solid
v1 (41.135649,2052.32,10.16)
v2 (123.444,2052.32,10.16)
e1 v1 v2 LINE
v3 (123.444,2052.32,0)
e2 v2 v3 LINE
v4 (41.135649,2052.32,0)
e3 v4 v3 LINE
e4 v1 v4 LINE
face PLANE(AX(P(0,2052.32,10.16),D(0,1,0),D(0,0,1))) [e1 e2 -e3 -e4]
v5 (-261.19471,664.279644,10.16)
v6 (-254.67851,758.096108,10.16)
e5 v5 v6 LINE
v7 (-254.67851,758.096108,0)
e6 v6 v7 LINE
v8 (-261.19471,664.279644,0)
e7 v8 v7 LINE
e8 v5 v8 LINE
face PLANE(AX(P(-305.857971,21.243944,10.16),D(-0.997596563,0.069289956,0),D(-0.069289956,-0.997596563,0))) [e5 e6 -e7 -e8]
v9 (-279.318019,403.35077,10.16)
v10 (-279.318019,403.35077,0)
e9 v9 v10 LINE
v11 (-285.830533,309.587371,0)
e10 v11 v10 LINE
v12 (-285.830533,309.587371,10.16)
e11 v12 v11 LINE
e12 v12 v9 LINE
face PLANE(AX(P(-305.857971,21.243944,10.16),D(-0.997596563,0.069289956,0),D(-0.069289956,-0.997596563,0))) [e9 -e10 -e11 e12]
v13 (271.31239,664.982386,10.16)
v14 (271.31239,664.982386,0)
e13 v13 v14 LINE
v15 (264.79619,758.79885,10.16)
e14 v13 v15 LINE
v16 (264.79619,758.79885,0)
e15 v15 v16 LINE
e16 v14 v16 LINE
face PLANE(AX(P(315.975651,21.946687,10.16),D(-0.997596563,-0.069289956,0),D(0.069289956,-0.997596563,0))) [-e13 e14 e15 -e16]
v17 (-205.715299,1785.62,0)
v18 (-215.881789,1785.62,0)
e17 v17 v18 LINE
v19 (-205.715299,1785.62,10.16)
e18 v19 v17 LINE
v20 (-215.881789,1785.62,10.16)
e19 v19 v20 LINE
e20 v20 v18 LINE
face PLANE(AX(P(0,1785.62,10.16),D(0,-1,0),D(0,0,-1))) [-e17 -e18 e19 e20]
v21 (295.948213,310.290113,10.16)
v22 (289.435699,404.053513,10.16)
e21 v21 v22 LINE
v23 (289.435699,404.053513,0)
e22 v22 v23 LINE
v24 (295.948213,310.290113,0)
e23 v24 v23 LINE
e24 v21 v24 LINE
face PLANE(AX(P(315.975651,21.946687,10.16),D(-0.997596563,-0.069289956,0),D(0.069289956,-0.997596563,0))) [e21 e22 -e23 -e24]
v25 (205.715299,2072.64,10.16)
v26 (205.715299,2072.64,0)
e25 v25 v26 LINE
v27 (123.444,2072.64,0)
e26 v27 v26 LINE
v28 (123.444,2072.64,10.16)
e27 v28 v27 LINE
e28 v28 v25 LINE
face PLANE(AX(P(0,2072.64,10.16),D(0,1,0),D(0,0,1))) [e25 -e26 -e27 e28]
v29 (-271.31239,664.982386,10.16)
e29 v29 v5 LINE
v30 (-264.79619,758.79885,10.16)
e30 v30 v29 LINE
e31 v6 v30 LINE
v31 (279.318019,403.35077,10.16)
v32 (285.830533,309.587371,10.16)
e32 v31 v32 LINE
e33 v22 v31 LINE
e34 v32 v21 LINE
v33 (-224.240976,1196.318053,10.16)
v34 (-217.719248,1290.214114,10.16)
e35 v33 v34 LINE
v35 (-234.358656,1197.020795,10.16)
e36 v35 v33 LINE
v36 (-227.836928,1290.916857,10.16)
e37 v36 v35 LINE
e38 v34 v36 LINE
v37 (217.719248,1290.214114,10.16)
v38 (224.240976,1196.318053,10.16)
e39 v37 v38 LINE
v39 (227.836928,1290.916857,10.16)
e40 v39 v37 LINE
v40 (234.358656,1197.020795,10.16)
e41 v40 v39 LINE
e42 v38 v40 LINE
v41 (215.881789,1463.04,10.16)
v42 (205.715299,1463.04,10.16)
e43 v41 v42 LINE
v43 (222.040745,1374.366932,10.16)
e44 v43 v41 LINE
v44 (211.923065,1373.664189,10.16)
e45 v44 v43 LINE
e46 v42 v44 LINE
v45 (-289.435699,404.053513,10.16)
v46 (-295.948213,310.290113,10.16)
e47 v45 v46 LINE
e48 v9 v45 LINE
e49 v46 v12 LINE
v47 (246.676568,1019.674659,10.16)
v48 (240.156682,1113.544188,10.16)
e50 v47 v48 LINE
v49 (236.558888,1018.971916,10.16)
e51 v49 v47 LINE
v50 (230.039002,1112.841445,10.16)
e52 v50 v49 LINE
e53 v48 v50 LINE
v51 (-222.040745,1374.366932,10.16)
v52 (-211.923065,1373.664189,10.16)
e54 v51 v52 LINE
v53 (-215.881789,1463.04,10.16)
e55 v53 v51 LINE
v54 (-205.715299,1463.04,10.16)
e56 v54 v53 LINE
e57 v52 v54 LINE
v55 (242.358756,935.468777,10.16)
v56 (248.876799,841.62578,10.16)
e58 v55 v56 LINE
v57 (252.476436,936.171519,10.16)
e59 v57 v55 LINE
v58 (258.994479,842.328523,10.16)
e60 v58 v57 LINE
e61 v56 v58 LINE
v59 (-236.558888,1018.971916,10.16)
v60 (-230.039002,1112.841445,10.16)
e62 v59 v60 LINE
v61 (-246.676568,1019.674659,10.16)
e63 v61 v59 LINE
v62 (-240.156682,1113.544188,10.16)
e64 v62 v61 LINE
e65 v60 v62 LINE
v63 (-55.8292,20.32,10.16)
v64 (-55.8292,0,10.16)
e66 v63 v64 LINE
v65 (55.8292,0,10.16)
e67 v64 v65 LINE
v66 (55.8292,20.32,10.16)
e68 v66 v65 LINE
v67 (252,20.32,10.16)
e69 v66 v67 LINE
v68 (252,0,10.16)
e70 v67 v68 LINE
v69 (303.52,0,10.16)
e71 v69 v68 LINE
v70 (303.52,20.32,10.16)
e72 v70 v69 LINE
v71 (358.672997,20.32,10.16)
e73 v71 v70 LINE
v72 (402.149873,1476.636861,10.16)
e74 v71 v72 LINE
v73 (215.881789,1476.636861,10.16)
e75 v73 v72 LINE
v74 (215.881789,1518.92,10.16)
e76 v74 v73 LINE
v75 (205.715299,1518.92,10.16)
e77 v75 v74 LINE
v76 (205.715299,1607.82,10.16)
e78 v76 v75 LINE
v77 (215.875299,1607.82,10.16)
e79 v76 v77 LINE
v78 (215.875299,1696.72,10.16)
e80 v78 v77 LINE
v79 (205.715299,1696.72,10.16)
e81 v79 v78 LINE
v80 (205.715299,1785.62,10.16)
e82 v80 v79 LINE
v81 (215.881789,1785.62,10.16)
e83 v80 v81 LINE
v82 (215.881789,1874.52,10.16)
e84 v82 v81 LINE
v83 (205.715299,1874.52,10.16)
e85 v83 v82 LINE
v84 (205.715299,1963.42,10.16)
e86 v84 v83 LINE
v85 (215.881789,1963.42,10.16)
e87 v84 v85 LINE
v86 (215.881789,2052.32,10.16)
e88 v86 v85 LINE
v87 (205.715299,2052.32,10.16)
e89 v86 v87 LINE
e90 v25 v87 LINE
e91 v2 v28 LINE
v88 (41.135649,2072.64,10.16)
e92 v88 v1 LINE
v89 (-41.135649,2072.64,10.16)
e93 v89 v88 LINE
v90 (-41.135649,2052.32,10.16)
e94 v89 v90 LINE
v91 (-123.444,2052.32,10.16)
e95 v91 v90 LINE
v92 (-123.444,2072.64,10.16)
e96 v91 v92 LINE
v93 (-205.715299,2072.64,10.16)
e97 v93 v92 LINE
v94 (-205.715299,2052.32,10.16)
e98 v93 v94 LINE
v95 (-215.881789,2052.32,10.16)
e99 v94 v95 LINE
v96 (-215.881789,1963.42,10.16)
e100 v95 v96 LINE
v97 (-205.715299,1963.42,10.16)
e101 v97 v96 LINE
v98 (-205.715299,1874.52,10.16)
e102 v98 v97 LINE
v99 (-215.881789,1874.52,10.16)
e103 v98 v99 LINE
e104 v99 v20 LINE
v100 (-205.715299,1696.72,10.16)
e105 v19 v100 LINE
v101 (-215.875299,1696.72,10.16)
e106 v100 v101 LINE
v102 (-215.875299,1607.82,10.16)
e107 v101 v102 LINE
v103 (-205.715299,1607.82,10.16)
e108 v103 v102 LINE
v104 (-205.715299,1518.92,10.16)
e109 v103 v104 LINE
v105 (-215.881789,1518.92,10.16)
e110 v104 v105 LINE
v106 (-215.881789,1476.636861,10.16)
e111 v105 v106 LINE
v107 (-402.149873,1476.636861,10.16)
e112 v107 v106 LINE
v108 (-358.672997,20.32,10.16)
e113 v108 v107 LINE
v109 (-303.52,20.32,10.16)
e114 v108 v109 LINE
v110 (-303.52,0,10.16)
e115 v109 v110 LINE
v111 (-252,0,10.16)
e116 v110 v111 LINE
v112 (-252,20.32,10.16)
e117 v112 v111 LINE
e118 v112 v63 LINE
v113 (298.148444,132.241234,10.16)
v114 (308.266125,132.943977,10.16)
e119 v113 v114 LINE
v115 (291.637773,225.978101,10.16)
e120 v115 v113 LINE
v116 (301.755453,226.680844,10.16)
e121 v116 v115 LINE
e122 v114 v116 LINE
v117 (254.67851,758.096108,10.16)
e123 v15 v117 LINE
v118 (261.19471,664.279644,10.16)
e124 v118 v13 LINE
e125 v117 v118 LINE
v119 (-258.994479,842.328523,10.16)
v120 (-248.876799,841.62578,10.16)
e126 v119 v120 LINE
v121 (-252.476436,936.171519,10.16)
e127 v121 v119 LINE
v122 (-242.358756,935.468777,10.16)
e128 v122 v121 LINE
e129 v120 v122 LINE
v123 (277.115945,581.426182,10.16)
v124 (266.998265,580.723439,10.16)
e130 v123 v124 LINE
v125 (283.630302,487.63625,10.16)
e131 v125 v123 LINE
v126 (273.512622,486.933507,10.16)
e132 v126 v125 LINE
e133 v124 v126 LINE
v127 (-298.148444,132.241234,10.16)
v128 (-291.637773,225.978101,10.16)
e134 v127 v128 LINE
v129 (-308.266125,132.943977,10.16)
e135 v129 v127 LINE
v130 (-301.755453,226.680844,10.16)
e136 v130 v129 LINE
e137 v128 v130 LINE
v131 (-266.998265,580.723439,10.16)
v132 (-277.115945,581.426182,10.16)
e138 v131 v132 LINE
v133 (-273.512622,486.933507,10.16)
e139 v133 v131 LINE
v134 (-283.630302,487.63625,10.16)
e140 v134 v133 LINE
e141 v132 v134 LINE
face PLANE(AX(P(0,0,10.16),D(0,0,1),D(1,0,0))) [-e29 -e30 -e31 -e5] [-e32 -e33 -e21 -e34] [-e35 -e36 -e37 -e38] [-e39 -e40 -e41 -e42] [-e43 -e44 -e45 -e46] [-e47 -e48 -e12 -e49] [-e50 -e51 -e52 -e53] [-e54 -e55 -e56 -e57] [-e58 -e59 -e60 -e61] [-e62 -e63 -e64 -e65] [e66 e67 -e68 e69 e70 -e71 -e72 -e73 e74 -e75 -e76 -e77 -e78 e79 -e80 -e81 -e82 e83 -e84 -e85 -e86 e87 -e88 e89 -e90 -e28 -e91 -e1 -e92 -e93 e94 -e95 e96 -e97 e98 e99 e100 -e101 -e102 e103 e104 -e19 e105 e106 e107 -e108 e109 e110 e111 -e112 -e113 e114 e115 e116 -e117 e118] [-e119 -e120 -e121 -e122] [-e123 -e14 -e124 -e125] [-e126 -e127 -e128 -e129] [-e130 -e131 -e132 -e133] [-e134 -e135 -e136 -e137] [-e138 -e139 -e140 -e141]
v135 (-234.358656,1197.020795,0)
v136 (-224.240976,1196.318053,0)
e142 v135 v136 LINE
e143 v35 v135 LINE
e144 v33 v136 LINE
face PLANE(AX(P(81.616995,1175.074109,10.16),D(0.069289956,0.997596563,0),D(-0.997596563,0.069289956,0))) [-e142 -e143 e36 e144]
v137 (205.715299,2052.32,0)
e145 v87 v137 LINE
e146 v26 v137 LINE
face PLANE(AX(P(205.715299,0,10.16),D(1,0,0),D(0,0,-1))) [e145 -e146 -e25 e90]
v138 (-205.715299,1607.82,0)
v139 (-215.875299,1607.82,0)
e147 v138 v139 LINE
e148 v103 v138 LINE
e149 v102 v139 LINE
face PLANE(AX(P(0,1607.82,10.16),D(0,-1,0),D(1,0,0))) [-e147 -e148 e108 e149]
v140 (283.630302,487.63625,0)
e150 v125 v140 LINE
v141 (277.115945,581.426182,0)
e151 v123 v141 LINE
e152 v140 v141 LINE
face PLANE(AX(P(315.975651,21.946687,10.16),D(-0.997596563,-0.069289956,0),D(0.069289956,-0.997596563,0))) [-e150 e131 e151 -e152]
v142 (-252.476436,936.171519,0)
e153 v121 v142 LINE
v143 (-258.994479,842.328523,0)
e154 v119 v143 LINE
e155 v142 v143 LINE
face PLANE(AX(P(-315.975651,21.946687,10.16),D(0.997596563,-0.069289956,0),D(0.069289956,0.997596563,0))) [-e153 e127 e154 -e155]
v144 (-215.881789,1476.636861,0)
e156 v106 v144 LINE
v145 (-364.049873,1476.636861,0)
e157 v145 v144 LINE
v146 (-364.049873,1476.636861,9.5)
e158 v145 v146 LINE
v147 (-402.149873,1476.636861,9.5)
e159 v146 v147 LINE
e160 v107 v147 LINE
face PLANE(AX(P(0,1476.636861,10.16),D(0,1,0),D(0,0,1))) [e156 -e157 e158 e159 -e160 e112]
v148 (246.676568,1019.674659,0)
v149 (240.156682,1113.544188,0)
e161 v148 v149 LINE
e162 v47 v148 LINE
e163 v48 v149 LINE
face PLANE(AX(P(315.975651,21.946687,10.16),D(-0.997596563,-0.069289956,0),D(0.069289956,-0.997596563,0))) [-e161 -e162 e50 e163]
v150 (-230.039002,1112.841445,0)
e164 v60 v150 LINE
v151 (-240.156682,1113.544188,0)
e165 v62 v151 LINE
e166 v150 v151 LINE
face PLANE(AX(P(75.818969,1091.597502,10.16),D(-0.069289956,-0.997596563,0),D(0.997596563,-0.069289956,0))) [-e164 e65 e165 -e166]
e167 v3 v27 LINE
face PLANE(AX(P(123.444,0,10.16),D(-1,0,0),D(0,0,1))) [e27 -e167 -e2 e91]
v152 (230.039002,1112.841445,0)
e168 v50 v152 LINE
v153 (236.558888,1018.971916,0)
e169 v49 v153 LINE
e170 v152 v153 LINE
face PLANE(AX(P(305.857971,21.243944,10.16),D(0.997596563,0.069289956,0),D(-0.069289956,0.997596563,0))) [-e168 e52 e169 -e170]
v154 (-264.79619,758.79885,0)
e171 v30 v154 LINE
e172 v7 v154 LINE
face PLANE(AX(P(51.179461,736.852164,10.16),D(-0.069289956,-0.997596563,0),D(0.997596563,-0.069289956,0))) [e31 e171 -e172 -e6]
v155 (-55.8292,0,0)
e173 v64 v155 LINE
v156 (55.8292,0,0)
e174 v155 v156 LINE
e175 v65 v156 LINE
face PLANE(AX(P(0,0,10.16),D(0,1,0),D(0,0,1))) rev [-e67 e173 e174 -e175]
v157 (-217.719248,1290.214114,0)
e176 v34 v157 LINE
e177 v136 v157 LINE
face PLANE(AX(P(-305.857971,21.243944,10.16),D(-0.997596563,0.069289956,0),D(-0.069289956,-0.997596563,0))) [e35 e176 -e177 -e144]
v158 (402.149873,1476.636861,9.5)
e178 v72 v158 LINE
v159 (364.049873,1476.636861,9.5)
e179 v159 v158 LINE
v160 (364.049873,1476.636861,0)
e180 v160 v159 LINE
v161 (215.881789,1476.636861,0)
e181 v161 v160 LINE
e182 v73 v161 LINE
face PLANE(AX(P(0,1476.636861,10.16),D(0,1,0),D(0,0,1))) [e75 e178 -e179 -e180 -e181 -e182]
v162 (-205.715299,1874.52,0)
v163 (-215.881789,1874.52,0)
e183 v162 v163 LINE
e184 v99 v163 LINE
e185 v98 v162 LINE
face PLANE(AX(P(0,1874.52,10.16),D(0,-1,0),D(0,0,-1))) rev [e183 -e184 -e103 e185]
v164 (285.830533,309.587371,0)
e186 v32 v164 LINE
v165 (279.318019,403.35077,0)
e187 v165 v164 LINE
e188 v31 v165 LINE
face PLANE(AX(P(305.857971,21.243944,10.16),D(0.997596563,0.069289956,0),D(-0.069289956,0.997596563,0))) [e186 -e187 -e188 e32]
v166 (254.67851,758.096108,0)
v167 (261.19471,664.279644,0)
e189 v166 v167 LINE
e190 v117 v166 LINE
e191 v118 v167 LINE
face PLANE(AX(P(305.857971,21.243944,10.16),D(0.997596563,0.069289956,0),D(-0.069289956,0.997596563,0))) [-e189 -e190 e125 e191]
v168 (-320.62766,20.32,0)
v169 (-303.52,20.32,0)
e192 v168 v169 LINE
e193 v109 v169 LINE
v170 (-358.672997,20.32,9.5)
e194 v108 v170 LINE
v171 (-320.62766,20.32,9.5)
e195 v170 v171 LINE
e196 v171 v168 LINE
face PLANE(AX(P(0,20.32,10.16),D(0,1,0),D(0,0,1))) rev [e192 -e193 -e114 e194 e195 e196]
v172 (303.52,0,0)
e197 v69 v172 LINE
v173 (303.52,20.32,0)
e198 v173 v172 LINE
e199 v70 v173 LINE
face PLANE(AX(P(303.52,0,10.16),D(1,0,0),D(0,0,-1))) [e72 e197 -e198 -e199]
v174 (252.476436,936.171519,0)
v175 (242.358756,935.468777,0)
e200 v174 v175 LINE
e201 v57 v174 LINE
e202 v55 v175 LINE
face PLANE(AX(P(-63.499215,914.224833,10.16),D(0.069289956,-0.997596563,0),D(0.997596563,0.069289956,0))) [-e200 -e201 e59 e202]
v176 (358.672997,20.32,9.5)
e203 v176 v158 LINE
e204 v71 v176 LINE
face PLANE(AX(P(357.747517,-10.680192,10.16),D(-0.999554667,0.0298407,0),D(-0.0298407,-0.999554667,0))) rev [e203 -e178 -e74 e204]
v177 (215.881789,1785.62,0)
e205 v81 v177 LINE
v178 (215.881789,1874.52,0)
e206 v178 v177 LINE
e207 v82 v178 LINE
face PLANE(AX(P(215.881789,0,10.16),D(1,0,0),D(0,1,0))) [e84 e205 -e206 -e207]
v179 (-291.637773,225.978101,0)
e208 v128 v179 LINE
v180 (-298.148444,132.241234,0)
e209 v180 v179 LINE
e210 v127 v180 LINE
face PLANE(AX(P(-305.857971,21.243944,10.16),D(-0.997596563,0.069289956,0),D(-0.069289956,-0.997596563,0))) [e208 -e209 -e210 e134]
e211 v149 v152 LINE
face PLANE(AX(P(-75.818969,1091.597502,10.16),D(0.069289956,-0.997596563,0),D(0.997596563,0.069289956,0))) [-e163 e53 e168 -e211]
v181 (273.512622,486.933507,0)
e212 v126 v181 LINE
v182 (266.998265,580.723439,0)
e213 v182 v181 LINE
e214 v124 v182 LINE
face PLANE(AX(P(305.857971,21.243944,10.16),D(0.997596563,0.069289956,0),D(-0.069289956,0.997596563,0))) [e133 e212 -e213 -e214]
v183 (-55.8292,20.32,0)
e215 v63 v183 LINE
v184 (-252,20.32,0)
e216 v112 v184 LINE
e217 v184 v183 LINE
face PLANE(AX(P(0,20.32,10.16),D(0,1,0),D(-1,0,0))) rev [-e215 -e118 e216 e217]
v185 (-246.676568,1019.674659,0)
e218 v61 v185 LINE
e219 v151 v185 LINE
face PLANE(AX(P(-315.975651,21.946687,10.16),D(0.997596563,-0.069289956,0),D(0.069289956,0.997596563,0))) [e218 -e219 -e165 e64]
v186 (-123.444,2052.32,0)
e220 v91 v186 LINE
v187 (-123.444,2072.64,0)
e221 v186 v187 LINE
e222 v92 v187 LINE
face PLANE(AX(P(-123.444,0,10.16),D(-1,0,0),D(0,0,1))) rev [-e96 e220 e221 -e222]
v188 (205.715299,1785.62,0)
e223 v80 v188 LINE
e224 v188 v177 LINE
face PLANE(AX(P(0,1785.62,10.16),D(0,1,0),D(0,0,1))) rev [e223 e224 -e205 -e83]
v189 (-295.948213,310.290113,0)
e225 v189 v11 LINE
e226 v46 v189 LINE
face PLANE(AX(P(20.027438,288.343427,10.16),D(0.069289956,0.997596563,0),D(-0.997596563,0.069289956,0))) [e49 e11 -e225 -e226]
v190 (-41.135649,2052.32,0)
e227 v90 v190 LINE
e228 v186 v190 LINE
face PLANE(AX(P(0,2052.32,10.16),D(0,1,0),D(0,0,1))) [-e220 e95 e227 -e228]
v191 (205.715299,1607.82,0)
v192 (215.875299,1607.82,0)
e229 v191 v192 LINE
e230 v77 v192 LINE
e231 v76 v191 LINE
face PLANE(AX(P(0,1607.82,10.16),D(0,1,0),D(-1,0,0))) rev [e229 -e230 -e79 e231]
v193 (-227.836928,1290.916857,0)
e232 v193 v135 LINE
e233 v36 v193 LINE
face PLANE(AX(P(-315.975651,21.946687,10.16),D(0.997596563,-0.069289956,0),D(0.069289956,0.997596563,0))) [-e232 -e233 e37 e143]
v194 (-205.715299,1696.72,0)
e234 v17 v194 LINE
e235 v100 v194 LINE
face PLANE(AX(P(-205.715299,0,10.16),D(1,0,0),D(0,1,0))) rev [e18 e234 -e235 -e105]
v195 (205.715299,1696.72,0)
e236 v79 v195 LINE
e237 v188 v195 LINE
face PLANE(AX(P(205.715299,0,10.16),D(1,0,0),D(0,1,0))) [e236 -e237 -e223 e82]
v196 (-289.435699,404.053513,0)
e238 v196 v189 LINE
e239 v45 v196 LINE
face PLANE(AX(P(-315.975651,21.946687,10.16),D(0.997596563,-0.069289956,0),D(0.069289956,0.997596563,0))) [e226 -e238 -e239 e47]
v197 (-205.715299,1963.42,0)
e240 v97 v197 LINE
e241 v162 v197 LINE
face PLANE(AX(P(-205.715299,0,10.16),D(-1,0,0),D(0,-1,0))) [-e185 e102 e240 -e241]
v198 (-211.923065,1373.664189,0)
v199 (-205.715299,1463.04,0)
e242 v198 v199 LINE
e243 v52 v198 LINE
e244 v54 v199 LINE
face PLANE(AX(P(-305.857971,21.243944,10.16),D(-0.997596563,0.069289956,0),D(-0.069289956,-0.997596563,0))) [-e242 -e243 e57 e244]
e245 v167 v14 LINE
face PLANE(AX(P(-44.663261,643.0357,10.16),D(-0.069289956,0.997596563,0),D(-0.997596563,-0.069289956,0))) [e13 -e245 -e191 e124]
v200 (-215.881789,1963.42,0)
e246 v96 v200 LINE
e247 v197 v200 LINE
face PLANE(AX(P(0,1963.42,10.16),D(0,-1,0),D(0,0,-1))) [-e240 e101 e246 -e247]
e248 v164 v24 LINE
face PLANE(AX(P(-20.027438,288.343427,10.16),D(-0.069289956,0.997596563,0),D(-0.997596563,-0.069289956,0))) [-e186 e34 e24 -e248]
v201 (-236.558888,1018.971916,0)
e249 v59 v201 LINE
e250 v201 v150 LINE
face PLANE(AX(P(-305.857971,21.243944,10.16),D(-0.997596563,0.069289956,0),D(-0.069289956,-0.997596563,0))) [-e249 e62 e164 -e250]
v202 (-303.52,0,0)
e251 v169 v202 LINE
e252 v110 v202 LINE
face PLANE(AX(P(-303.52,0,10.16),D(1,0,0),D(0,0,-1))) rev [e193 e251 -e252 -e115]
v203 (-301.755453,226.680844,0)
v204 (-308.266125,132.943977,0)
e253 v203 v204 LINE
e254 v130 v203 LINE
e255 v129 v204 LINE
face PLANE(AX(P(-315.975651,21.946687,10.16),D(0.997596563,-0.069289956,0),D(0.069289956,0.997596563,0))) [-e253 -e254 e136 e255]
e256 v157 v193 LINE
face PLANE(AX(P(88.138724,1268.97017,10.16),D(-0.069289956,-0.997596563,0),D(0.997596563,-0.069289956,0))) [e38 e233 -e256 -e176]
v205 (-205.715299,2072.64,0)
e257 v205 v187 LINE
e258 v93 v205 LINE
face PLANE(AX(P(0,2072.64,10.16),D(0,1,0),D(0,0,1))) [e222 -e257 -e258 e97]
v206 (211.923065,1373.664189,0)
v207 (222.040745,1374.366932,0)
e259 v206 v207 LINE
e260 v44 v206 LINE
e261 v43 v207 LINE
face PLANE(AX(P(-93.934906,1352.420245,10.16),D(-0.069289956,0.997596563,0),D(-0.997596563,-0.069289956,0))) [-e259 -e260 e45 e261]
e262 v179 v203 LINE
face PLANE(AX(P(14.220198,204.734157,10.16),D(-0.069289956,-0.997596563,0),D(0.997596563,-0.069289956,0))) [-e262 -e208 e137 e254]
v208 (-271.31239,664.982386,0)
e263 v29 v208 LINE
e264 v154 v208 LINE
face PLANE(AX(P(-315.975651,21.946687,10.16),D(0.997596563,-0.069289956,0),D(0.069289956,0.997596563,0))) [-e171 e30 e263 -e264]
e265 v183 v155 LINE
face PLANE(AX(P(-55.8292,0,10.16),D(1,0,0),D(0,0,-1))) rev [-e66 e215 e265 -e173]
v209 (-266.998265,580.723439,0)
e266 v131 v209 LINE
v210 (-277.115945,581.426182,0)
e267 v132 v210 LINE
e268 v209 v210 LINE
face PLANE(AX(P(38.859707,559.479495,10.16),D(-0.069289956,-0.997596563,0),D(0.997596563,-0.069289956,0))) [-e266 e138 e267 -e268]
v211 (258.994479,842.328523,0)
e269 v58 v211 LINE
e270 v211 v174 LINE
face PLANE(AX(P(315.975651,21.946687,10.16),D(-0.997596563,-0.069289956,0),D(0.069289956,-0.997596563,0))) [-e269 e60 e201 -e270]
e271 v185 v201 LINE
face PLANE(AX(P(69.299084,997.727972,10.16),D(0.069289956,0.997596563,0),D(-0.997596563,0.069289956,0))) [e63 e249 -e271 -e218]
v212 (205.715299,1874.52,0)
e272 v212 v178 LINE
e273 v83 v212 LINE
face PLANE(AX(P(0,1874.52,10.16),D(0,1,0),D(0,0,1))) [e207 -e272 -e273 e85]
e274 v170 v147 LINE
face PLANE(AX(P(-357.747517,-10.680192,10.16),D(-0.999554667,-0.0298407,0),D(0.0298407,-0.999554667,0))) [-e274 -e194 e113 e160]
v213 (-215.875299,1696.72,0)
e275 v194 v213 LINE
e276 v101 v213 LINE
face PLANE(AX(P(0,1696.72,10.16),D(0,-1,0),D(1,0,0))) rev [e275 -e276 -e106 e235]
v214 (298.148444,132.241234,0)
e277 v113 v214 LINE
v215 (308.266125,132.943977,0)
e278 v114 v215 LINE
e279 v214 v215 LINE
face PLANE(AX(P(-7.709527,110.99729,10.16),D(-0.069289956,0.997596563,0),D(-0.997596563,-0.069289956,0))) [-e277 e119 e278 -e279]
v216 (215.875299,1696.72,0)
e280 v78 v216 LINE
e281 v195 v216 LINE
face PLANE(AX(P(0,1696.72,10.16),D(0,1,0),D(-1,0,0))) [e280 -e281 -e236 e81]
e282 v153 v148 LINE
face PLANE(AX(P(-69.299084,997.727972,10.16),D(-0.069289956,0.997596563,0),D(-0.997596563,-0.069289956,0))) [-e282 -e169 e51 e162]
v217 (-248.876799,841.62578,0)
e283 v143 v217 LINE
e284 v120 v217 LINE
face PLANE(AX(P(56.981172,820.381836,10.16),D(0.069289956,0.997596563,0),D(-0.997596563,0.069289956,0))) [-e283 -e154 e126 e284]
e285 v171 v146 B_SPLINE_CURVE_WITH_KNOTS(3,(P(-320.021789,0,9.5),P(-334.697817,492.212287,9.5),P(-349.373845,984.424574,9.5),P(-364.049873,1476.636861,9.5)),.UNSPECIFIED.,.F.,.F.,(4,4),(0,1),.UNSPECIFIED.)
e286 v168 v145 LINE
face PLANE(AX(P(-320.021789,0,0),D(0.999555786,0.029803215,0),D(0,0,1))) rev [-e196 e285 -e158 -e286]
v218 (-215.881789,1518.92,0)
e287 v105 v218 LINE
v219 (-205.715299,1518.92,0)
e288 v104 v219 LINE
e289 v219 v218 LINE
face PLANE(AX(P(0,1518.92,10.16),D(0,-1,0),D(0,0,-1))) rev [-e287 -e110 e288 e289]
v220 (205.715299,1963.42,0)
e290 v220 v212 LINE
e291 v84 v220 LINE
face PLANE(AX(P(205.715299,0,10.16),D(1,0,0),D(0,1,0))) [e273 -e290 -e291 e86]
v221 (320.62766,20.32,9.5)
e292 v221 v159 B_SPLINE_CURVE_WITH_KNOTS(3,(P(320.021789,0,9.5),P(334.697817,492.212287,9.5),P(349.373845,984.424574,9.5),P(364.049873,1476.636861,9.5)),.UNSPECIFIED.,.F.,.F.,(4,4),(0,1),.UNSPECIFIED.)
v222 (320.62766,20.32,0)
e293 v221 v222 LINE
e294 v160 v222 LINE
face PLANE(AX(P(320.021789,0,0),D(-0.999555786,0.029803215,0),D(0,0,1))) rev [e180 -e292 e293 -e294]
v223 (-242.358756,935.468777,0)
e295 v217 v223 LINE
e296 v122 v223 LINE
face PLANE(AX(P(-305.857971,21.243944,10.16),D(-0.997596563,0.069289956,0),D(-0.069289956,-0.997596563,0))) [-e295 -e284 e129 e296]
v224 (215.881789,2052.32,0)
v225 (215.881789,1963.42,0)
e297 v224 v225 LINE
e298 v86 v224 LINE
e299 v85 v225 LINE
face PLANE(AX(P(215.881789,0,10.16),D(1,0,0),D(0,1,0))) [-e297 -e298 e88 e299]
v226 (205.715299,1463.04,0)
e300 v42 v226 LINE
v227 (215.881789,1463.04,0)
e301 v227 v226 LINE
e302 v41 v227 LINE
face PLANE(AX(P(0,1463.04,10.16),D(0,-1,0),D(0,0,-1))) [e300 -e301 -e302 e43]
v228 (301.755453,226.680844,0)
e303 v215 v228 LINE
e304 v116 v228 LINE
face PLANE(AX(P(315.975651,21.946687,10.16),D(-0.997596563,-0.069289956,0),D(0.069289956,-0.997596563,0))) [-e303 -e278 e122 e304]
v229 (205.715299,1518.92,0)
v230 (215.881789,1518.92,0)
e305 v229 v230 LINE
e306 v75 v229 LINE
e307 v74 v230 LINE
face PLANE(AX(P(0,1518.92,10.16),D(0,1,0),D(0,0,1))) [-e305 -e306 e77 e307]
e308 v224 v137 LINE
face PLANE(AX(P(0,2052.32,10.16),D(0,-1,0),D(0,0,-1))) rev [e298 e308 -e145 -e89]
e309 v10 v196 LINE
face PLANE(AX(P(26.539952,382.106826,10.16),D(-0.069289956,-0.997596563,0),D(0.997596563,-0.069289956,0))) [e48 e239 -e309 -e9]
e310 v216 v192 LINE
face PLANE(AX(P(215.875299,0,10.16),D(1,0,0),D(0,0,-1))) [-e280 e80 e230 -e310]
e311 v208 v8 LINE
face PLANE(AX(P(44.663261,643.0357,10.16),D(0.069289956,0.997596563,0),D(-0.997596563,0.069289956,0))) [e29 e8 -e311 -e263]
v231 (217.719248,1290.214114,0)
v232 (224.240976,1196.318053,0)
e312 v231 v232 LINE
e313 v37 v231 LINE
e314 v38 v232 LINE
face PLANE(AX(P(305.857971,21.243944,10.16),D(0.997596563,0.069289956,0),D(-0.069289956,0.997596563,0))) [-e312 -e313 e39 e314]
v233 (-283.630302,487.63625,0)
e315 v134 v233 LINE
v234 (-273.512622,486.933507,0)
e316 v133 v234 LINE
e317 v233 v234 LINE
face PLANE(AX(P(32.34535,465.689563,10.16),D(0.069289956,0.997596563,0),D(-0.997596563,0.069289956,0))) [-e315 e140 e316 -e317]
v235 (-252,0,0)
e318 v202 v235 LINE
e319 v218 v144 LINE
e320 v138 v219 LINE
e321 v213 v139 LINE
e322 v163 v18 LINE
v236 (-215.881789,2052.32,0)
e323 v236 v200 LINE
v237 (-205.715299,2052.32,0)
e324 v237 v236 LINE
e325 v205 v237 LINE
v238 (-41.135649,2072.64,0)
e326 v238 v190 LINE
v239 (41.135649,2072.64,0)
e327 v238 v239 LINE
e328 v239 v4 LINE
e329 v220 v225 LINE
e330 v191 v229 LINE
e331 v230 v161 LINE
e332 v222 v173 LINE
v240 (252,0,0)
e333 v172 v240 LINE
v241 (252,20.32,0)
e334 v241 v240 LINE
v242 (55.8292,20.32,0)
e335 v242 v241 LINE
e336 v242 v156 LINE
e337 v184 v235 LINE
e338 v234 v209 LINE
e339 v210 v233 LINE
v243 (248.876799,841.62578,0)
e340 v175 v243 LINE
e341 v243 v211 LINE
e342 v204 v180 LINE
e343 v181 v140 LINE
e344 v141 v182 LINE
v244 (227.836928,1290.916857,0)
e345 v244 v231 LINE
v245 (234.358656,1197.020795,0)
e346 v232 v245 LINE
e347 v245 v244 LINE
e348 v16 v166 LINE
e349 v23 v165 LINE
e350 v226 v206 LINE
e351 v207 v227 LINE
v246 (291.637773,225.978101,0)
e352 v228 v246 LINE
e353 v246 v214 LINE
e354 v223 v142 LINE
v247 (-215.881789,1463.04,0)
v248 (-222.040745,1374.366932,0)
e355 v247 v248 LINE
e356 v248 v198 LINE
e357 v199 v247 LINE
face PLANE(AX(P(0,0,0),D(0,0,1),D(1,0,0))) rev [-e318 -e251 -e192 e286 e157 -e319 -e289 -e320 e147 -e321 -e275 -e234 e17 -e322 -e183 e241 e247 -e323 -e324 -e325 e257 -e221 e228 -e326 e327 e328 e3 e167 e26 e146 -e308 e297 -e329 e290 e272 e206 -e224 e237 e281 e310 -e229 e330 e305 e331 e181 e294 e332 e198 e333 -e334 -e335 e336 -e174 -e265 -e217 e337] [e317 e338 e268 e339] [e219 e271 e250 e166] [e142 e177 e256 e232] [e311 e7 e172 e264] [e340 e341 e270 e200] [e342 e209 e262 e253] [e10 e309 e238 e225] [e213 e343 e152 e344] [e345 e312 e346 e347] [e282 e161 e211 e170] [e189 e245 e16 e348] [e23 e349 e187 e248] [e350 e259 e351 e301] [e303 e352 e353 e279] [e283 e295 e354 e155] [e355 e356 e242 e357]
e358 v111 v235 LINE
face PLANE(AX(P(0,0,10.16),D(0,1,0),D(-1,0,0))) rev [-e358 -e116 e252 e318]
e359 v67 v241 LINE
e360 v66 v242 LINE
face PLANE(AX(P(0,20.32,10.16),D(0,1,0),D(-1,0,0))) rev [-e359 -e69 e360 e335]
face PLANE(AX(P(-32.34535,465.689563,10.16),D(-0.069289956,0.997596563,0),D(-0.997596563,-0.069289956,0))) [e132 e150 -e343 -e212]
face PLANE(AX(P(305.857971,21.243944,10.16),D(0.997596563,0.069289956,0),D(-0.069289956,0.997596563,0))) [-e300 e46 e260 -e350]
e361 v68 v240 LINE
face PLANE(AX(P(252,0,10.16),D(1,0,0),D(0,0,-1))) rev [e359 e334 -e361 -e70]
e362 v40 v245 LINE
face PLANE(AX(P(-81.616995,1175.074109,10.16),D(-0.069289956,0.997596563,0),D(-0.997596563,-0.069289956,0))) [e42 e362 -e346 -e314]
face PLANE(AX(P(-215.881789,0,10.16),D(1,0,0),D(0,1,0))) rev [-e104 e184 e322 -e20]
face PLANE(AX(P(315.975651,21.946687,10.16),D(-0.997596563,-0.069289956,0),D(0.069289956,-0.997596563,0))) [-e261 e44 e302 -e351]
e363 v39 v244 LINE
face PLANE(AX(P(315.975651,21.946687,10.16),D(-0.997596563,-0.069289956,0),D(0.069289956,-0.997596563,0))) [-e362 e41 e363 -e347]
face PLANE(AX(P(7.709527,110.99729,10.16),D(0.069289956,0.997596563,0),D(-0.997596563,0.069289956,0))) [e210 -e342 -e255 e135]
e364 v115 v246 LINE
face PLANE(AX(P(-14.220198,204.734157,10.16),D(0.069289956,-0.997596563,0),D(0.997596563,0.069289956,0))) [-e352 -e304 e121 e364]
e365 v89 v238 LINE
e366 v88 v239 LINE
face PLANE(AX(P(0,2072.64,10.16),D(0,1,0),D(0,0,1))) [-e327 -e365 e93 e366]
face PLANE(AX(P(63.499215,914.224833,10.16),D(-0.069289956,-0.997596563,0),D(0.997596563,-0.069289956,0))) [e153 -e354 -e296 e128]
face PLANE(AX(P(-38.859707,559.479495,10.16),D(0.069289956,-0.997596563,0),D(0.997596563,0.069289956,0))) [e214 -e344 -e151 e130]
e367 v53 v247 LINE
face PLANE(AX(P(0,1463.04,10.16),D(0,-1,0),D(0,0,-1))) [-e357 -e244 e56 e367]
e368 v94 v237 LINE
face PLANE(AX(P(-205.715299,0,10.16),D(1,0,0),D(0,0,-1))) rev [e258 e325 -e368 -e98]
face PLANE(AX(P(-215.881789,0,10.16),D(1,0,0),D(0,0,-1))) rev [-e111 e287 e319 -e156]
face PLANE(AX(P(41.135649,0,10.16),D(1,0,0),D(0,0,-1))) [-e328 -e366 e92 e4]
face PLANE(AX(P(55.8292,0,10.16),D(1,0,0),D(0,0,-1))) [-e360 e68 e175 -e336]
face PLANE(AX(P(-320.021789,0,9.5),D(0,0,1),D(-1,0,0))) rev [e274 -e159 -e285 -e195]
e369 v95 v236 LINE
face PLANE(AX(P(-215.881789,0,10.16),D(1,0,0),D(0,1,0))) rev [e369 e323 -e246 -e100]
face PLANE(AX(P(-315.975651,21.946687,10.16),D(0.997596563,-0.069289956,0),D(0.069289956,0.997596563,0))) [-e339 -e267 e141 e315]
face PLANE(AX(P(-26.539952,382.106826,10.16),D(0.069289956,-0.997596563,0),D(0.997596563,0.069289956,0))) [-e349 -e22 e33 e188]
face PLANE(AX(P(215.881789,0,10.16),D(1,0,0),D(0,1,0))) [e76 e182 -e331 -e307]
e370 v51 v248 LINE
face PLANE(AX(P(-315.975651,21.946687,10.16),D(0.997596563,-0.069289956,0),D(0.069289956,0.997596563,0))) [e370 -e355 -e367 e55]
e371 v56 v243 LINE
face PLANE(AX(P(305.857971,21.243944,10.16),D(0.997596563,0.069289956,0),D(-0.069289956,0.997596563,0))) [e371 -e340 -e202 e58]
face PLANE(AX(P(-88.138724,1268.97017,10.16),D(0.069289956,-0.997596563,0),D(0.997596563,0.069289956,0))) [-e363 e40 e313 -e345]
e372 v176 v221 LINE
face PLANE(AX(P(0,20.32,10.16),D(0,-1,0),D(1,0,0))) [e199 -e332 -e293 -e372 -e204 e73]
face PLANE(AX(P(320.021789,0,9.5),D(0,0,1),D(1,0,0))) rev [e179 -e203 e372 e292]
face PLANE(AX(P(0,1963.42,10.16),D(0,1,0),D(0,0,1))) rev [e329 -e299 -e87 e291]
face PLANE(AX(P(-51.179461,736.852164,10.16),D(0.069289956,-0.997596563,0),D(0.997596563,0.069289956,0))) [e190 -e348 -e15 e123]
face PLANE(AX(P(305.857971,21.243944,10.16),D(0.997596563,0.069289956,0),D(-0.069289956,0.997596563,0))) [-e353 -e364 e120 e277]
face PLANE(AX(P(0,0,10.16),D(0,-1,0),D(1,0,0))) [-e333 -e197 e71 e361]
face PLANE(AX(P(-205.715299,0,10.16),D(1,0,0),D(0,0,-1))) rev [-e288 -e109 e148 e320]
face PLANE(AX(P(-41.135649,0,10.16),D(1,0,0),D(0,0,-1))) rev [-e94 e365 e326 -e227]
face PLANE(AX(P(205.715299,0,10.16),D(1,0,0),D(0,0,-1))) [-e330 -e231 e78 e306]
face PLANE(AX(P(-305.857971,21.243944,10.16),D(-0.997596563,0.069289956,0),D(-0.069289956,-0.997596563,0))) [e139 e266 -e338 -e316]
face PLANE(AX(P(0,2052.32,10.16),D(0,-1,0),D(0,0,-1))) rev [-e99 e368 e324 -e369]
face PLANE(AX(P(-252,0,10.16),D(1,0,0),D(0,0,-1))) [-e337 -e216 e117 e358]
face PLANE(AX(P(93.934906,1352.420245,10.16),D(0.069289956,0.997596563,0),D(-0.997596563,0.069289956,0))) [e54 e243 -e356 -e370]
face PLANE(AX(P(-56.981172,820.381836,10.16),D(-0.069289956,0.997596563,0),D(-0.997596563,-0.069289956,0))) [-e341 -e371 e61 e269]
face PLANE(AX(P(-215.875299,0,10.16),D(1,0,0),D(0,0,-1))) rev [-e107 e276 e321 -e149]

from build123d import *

# Parameters (mm, degrees)
BOSS_EXTRUDE1_DEPTH = 10.16
CUT_LOFT1_DEPTH     = 9.5


# Read off the part's stored shape, not the designer's step: Cut-Loft1
with BuildPart() as part:
    # Sketch1 → Boss-Extrude1 (new body)
    # profile 1 of 2: a face of its own
    with BuildSketch(Plane.XY):
        Polygon((205.715298803, 2072.64), (123.444, 2072.64), (123.444, 2052.32), (41.135649402, 2052.32), (41.135649402, 2072.64), (-41.135649402, 2072.64), (-41.135649402, 2052.32), (-123.444, 2052.32), (-123.444, 2072.64), (-205.715298803, 2072.64), (-205.715298803, 2052.32), (-215.881789204, 2052.32), (-215.881789204, 1963.42), (-205.715298803, 1963.42), (-205.715298803, 1874.52), (-215.881789204, 1874.52), (-215.881789204, 1785.62), (-205.715298803, 1785.62), (-205.715298803, 1696.72), (-215.875298803, 1696.72), (-215.875298803, 1607.82), (-205.715298803, 1607.82), (-205.715298803, 1518.92), (205.715298803, 1518.92), (205.715298803, 1607.82), (215.875298803, 1607.82), (215.875298803, 1696.72), (205.715298803, 1696.72), (205.715298803, 1785.62), (215.881789204, 1785.62), (215.881789204, 1874.52), (205.715298803, 1874.52), (205.715298803, 1963.42), (215.881789204, 1963.42), (215.881789204, 2052.32), (205.715298803, 2052.32), align=None)
    # profile 2 of 2: a face of its own
    with BuildSketch(Plane.XY):
        Polygon((215.881789204, 1518.92), (205.715298803, 1518.92), (-205.715298803, 1518.92), (-215.881789204, 1518.92), (-215.881789204, 1476.636861244), (-402.149872815, 1476.636861244), (-358.672996954, 20.32), (-303.52, 20.32), (-303.52, 0), (-252, 0), (-252, 20.32), (-55.8292, 20.32), (-55.8292, 0), (55.8292, 0), (55.8292, 20.32), (252, 20.32), (252, 0), (303.52, 0), (303.52, 20.32), (358.672996954, 20.32), (402.149872815, 1476.636861244), (215.881789204, 1476.636861244), align=None)
        Polygon((-308.266124544, 132.94397688), (-301.755453134, 226.680843836), (-291.63777305, 225.978101227), (-298.14844446, 132.241234271), align=None, mode=Mode.SUBTRACT)
        Polygon((-289.435698895, 404.053512688), (-279.318018811, 403.350770078), (-285.830533081, 309.587370692), (-295.948213166, 310.290113301), align=None, mode=Mode.SUBTRACT)
        Polygon((-283.630301787, 487.636249721), (-277.115944656, 581.426181539), (-266.998264572, 580.72343893), (-273.512621703, 486.933507112), align=None, mode=Mode.SUBTRACT)
        Polygon((-264.796190418, 758.798850391), (-254.678510334, 758.096107781), (-261.194710324, 664.279643533), (-271.312390408, 664.982386142), align=None, mode=Mode.SUBTRACT)
        Polygon((-252.476436179, 936.171519242), (-242.358756095, 935.468776633), (-248.876798945, 841.625779953), (-258.99447903, 842.328522563), align=None, mode=Mode.SUBTRACT)
        Polygon((301.755453134, 226.680843836), (308.266124544, 132.94397688), (298.14844446, 132.241234271), (291.63777305, 225.978101227), align=None, mode=Mode.SUBTRACT)
        Polygon((279.318018811, 403.350770078), (289.435698895, 404.053512688), (295.948213166, 310.290113301), (285.830533081, 309.587370692), align=None, mode=Mode.SUBTRACT)
        Polygon((277.115944656, 581.426181539), (283.630301787, 487.636249721), (273.512621703, 486.933507112), (266.998264572, 580.72343893), align=None, mode=Mode.SUBTRACT)
        Polygon((254.678510334, 758.096107781), (264.796190418, 758.798850391), (271.312390408, 664.982386142), (261.194710324, 664.279643533), align=None, mode=Mode.SUBTRACT)
        Polygon((242.358756095, 935.468776633), (252.476436179, 936.171519242), (258.99447903, 842.328522563), (248.876798945, 841.625779953), align=None, mode=Mode.SUBTRACT)
        Polygon((-240.15668194, 1113.544188093), (-230.039001856, 1112.841445484), (-236.558887567, 1018.971916374), (-246.676567651, 1019.674658983), align=None, mode=Mode.SUBTRACT)
        Polygon((-227.836927701, 1290.916856945), (-217.719247617, 1290.214114336), (-224.240976188, 1196.318052795), (-234.358656272, 1197.020795404), align=None, mode=Mode.SUBTRACT)
        Polygon((-215.881789204, 1463.040000035), (-214.479068593, 1463.040000035), (-205.715298803, 1463.040000035), (-211.92306481, 1373.664189215), (-222.040744894, 1374.366931824), align=None, mode=Mode.SUBTRACT)
        Polygon((230.039001856, 1112.841445484), (240.15668194, 1113.544188093), (246.676567651, 1019.674658983), (236.558887567, 1018.971916374), align=None, mode=Mode.SUBTRACT)
        Polygon((217.719247617, 1290.214114336), (227.836927701, 1290.916856945), (234.358656272, 1197.020795404), (224.240976188, 1196.318052795), align=None, mode=Mode.SUBTRACT)
        Polygon((205.715298803, 1463.040000035), (215.881789204, 1463.040000035), (222.040744894, 1374.366931824), (211.92306481, 1373.664189215), align=None, mode=Mode.SUBTRACT)
    extrude(amount=BOSS_EXTRUDE1_DEPTH)

    # Cut-Loft1 outline → Cut-Loft1 (cut)
    with BuildSketch(Plane.XY):
        Polygon((402.149872815, 1476.636861244), (364.049872815, 1476.636861244), (320.627659668, 20.32), (358.672996954, 20.32), align=None)
    cut_loft1 = extrude(amount=CUT_LOFT1_DEPTH, mode=Mode.SUBTRACT)

    # Mirror1: Cut-Loft1 across plane
    add(cut_loft1.mirror(Plane(origin=(0, 0, 0), x_dir=(0, 0, 1), z_dir=(1, 0, 0))), mode=Mode.SUBTRACT)


solid = part.part
